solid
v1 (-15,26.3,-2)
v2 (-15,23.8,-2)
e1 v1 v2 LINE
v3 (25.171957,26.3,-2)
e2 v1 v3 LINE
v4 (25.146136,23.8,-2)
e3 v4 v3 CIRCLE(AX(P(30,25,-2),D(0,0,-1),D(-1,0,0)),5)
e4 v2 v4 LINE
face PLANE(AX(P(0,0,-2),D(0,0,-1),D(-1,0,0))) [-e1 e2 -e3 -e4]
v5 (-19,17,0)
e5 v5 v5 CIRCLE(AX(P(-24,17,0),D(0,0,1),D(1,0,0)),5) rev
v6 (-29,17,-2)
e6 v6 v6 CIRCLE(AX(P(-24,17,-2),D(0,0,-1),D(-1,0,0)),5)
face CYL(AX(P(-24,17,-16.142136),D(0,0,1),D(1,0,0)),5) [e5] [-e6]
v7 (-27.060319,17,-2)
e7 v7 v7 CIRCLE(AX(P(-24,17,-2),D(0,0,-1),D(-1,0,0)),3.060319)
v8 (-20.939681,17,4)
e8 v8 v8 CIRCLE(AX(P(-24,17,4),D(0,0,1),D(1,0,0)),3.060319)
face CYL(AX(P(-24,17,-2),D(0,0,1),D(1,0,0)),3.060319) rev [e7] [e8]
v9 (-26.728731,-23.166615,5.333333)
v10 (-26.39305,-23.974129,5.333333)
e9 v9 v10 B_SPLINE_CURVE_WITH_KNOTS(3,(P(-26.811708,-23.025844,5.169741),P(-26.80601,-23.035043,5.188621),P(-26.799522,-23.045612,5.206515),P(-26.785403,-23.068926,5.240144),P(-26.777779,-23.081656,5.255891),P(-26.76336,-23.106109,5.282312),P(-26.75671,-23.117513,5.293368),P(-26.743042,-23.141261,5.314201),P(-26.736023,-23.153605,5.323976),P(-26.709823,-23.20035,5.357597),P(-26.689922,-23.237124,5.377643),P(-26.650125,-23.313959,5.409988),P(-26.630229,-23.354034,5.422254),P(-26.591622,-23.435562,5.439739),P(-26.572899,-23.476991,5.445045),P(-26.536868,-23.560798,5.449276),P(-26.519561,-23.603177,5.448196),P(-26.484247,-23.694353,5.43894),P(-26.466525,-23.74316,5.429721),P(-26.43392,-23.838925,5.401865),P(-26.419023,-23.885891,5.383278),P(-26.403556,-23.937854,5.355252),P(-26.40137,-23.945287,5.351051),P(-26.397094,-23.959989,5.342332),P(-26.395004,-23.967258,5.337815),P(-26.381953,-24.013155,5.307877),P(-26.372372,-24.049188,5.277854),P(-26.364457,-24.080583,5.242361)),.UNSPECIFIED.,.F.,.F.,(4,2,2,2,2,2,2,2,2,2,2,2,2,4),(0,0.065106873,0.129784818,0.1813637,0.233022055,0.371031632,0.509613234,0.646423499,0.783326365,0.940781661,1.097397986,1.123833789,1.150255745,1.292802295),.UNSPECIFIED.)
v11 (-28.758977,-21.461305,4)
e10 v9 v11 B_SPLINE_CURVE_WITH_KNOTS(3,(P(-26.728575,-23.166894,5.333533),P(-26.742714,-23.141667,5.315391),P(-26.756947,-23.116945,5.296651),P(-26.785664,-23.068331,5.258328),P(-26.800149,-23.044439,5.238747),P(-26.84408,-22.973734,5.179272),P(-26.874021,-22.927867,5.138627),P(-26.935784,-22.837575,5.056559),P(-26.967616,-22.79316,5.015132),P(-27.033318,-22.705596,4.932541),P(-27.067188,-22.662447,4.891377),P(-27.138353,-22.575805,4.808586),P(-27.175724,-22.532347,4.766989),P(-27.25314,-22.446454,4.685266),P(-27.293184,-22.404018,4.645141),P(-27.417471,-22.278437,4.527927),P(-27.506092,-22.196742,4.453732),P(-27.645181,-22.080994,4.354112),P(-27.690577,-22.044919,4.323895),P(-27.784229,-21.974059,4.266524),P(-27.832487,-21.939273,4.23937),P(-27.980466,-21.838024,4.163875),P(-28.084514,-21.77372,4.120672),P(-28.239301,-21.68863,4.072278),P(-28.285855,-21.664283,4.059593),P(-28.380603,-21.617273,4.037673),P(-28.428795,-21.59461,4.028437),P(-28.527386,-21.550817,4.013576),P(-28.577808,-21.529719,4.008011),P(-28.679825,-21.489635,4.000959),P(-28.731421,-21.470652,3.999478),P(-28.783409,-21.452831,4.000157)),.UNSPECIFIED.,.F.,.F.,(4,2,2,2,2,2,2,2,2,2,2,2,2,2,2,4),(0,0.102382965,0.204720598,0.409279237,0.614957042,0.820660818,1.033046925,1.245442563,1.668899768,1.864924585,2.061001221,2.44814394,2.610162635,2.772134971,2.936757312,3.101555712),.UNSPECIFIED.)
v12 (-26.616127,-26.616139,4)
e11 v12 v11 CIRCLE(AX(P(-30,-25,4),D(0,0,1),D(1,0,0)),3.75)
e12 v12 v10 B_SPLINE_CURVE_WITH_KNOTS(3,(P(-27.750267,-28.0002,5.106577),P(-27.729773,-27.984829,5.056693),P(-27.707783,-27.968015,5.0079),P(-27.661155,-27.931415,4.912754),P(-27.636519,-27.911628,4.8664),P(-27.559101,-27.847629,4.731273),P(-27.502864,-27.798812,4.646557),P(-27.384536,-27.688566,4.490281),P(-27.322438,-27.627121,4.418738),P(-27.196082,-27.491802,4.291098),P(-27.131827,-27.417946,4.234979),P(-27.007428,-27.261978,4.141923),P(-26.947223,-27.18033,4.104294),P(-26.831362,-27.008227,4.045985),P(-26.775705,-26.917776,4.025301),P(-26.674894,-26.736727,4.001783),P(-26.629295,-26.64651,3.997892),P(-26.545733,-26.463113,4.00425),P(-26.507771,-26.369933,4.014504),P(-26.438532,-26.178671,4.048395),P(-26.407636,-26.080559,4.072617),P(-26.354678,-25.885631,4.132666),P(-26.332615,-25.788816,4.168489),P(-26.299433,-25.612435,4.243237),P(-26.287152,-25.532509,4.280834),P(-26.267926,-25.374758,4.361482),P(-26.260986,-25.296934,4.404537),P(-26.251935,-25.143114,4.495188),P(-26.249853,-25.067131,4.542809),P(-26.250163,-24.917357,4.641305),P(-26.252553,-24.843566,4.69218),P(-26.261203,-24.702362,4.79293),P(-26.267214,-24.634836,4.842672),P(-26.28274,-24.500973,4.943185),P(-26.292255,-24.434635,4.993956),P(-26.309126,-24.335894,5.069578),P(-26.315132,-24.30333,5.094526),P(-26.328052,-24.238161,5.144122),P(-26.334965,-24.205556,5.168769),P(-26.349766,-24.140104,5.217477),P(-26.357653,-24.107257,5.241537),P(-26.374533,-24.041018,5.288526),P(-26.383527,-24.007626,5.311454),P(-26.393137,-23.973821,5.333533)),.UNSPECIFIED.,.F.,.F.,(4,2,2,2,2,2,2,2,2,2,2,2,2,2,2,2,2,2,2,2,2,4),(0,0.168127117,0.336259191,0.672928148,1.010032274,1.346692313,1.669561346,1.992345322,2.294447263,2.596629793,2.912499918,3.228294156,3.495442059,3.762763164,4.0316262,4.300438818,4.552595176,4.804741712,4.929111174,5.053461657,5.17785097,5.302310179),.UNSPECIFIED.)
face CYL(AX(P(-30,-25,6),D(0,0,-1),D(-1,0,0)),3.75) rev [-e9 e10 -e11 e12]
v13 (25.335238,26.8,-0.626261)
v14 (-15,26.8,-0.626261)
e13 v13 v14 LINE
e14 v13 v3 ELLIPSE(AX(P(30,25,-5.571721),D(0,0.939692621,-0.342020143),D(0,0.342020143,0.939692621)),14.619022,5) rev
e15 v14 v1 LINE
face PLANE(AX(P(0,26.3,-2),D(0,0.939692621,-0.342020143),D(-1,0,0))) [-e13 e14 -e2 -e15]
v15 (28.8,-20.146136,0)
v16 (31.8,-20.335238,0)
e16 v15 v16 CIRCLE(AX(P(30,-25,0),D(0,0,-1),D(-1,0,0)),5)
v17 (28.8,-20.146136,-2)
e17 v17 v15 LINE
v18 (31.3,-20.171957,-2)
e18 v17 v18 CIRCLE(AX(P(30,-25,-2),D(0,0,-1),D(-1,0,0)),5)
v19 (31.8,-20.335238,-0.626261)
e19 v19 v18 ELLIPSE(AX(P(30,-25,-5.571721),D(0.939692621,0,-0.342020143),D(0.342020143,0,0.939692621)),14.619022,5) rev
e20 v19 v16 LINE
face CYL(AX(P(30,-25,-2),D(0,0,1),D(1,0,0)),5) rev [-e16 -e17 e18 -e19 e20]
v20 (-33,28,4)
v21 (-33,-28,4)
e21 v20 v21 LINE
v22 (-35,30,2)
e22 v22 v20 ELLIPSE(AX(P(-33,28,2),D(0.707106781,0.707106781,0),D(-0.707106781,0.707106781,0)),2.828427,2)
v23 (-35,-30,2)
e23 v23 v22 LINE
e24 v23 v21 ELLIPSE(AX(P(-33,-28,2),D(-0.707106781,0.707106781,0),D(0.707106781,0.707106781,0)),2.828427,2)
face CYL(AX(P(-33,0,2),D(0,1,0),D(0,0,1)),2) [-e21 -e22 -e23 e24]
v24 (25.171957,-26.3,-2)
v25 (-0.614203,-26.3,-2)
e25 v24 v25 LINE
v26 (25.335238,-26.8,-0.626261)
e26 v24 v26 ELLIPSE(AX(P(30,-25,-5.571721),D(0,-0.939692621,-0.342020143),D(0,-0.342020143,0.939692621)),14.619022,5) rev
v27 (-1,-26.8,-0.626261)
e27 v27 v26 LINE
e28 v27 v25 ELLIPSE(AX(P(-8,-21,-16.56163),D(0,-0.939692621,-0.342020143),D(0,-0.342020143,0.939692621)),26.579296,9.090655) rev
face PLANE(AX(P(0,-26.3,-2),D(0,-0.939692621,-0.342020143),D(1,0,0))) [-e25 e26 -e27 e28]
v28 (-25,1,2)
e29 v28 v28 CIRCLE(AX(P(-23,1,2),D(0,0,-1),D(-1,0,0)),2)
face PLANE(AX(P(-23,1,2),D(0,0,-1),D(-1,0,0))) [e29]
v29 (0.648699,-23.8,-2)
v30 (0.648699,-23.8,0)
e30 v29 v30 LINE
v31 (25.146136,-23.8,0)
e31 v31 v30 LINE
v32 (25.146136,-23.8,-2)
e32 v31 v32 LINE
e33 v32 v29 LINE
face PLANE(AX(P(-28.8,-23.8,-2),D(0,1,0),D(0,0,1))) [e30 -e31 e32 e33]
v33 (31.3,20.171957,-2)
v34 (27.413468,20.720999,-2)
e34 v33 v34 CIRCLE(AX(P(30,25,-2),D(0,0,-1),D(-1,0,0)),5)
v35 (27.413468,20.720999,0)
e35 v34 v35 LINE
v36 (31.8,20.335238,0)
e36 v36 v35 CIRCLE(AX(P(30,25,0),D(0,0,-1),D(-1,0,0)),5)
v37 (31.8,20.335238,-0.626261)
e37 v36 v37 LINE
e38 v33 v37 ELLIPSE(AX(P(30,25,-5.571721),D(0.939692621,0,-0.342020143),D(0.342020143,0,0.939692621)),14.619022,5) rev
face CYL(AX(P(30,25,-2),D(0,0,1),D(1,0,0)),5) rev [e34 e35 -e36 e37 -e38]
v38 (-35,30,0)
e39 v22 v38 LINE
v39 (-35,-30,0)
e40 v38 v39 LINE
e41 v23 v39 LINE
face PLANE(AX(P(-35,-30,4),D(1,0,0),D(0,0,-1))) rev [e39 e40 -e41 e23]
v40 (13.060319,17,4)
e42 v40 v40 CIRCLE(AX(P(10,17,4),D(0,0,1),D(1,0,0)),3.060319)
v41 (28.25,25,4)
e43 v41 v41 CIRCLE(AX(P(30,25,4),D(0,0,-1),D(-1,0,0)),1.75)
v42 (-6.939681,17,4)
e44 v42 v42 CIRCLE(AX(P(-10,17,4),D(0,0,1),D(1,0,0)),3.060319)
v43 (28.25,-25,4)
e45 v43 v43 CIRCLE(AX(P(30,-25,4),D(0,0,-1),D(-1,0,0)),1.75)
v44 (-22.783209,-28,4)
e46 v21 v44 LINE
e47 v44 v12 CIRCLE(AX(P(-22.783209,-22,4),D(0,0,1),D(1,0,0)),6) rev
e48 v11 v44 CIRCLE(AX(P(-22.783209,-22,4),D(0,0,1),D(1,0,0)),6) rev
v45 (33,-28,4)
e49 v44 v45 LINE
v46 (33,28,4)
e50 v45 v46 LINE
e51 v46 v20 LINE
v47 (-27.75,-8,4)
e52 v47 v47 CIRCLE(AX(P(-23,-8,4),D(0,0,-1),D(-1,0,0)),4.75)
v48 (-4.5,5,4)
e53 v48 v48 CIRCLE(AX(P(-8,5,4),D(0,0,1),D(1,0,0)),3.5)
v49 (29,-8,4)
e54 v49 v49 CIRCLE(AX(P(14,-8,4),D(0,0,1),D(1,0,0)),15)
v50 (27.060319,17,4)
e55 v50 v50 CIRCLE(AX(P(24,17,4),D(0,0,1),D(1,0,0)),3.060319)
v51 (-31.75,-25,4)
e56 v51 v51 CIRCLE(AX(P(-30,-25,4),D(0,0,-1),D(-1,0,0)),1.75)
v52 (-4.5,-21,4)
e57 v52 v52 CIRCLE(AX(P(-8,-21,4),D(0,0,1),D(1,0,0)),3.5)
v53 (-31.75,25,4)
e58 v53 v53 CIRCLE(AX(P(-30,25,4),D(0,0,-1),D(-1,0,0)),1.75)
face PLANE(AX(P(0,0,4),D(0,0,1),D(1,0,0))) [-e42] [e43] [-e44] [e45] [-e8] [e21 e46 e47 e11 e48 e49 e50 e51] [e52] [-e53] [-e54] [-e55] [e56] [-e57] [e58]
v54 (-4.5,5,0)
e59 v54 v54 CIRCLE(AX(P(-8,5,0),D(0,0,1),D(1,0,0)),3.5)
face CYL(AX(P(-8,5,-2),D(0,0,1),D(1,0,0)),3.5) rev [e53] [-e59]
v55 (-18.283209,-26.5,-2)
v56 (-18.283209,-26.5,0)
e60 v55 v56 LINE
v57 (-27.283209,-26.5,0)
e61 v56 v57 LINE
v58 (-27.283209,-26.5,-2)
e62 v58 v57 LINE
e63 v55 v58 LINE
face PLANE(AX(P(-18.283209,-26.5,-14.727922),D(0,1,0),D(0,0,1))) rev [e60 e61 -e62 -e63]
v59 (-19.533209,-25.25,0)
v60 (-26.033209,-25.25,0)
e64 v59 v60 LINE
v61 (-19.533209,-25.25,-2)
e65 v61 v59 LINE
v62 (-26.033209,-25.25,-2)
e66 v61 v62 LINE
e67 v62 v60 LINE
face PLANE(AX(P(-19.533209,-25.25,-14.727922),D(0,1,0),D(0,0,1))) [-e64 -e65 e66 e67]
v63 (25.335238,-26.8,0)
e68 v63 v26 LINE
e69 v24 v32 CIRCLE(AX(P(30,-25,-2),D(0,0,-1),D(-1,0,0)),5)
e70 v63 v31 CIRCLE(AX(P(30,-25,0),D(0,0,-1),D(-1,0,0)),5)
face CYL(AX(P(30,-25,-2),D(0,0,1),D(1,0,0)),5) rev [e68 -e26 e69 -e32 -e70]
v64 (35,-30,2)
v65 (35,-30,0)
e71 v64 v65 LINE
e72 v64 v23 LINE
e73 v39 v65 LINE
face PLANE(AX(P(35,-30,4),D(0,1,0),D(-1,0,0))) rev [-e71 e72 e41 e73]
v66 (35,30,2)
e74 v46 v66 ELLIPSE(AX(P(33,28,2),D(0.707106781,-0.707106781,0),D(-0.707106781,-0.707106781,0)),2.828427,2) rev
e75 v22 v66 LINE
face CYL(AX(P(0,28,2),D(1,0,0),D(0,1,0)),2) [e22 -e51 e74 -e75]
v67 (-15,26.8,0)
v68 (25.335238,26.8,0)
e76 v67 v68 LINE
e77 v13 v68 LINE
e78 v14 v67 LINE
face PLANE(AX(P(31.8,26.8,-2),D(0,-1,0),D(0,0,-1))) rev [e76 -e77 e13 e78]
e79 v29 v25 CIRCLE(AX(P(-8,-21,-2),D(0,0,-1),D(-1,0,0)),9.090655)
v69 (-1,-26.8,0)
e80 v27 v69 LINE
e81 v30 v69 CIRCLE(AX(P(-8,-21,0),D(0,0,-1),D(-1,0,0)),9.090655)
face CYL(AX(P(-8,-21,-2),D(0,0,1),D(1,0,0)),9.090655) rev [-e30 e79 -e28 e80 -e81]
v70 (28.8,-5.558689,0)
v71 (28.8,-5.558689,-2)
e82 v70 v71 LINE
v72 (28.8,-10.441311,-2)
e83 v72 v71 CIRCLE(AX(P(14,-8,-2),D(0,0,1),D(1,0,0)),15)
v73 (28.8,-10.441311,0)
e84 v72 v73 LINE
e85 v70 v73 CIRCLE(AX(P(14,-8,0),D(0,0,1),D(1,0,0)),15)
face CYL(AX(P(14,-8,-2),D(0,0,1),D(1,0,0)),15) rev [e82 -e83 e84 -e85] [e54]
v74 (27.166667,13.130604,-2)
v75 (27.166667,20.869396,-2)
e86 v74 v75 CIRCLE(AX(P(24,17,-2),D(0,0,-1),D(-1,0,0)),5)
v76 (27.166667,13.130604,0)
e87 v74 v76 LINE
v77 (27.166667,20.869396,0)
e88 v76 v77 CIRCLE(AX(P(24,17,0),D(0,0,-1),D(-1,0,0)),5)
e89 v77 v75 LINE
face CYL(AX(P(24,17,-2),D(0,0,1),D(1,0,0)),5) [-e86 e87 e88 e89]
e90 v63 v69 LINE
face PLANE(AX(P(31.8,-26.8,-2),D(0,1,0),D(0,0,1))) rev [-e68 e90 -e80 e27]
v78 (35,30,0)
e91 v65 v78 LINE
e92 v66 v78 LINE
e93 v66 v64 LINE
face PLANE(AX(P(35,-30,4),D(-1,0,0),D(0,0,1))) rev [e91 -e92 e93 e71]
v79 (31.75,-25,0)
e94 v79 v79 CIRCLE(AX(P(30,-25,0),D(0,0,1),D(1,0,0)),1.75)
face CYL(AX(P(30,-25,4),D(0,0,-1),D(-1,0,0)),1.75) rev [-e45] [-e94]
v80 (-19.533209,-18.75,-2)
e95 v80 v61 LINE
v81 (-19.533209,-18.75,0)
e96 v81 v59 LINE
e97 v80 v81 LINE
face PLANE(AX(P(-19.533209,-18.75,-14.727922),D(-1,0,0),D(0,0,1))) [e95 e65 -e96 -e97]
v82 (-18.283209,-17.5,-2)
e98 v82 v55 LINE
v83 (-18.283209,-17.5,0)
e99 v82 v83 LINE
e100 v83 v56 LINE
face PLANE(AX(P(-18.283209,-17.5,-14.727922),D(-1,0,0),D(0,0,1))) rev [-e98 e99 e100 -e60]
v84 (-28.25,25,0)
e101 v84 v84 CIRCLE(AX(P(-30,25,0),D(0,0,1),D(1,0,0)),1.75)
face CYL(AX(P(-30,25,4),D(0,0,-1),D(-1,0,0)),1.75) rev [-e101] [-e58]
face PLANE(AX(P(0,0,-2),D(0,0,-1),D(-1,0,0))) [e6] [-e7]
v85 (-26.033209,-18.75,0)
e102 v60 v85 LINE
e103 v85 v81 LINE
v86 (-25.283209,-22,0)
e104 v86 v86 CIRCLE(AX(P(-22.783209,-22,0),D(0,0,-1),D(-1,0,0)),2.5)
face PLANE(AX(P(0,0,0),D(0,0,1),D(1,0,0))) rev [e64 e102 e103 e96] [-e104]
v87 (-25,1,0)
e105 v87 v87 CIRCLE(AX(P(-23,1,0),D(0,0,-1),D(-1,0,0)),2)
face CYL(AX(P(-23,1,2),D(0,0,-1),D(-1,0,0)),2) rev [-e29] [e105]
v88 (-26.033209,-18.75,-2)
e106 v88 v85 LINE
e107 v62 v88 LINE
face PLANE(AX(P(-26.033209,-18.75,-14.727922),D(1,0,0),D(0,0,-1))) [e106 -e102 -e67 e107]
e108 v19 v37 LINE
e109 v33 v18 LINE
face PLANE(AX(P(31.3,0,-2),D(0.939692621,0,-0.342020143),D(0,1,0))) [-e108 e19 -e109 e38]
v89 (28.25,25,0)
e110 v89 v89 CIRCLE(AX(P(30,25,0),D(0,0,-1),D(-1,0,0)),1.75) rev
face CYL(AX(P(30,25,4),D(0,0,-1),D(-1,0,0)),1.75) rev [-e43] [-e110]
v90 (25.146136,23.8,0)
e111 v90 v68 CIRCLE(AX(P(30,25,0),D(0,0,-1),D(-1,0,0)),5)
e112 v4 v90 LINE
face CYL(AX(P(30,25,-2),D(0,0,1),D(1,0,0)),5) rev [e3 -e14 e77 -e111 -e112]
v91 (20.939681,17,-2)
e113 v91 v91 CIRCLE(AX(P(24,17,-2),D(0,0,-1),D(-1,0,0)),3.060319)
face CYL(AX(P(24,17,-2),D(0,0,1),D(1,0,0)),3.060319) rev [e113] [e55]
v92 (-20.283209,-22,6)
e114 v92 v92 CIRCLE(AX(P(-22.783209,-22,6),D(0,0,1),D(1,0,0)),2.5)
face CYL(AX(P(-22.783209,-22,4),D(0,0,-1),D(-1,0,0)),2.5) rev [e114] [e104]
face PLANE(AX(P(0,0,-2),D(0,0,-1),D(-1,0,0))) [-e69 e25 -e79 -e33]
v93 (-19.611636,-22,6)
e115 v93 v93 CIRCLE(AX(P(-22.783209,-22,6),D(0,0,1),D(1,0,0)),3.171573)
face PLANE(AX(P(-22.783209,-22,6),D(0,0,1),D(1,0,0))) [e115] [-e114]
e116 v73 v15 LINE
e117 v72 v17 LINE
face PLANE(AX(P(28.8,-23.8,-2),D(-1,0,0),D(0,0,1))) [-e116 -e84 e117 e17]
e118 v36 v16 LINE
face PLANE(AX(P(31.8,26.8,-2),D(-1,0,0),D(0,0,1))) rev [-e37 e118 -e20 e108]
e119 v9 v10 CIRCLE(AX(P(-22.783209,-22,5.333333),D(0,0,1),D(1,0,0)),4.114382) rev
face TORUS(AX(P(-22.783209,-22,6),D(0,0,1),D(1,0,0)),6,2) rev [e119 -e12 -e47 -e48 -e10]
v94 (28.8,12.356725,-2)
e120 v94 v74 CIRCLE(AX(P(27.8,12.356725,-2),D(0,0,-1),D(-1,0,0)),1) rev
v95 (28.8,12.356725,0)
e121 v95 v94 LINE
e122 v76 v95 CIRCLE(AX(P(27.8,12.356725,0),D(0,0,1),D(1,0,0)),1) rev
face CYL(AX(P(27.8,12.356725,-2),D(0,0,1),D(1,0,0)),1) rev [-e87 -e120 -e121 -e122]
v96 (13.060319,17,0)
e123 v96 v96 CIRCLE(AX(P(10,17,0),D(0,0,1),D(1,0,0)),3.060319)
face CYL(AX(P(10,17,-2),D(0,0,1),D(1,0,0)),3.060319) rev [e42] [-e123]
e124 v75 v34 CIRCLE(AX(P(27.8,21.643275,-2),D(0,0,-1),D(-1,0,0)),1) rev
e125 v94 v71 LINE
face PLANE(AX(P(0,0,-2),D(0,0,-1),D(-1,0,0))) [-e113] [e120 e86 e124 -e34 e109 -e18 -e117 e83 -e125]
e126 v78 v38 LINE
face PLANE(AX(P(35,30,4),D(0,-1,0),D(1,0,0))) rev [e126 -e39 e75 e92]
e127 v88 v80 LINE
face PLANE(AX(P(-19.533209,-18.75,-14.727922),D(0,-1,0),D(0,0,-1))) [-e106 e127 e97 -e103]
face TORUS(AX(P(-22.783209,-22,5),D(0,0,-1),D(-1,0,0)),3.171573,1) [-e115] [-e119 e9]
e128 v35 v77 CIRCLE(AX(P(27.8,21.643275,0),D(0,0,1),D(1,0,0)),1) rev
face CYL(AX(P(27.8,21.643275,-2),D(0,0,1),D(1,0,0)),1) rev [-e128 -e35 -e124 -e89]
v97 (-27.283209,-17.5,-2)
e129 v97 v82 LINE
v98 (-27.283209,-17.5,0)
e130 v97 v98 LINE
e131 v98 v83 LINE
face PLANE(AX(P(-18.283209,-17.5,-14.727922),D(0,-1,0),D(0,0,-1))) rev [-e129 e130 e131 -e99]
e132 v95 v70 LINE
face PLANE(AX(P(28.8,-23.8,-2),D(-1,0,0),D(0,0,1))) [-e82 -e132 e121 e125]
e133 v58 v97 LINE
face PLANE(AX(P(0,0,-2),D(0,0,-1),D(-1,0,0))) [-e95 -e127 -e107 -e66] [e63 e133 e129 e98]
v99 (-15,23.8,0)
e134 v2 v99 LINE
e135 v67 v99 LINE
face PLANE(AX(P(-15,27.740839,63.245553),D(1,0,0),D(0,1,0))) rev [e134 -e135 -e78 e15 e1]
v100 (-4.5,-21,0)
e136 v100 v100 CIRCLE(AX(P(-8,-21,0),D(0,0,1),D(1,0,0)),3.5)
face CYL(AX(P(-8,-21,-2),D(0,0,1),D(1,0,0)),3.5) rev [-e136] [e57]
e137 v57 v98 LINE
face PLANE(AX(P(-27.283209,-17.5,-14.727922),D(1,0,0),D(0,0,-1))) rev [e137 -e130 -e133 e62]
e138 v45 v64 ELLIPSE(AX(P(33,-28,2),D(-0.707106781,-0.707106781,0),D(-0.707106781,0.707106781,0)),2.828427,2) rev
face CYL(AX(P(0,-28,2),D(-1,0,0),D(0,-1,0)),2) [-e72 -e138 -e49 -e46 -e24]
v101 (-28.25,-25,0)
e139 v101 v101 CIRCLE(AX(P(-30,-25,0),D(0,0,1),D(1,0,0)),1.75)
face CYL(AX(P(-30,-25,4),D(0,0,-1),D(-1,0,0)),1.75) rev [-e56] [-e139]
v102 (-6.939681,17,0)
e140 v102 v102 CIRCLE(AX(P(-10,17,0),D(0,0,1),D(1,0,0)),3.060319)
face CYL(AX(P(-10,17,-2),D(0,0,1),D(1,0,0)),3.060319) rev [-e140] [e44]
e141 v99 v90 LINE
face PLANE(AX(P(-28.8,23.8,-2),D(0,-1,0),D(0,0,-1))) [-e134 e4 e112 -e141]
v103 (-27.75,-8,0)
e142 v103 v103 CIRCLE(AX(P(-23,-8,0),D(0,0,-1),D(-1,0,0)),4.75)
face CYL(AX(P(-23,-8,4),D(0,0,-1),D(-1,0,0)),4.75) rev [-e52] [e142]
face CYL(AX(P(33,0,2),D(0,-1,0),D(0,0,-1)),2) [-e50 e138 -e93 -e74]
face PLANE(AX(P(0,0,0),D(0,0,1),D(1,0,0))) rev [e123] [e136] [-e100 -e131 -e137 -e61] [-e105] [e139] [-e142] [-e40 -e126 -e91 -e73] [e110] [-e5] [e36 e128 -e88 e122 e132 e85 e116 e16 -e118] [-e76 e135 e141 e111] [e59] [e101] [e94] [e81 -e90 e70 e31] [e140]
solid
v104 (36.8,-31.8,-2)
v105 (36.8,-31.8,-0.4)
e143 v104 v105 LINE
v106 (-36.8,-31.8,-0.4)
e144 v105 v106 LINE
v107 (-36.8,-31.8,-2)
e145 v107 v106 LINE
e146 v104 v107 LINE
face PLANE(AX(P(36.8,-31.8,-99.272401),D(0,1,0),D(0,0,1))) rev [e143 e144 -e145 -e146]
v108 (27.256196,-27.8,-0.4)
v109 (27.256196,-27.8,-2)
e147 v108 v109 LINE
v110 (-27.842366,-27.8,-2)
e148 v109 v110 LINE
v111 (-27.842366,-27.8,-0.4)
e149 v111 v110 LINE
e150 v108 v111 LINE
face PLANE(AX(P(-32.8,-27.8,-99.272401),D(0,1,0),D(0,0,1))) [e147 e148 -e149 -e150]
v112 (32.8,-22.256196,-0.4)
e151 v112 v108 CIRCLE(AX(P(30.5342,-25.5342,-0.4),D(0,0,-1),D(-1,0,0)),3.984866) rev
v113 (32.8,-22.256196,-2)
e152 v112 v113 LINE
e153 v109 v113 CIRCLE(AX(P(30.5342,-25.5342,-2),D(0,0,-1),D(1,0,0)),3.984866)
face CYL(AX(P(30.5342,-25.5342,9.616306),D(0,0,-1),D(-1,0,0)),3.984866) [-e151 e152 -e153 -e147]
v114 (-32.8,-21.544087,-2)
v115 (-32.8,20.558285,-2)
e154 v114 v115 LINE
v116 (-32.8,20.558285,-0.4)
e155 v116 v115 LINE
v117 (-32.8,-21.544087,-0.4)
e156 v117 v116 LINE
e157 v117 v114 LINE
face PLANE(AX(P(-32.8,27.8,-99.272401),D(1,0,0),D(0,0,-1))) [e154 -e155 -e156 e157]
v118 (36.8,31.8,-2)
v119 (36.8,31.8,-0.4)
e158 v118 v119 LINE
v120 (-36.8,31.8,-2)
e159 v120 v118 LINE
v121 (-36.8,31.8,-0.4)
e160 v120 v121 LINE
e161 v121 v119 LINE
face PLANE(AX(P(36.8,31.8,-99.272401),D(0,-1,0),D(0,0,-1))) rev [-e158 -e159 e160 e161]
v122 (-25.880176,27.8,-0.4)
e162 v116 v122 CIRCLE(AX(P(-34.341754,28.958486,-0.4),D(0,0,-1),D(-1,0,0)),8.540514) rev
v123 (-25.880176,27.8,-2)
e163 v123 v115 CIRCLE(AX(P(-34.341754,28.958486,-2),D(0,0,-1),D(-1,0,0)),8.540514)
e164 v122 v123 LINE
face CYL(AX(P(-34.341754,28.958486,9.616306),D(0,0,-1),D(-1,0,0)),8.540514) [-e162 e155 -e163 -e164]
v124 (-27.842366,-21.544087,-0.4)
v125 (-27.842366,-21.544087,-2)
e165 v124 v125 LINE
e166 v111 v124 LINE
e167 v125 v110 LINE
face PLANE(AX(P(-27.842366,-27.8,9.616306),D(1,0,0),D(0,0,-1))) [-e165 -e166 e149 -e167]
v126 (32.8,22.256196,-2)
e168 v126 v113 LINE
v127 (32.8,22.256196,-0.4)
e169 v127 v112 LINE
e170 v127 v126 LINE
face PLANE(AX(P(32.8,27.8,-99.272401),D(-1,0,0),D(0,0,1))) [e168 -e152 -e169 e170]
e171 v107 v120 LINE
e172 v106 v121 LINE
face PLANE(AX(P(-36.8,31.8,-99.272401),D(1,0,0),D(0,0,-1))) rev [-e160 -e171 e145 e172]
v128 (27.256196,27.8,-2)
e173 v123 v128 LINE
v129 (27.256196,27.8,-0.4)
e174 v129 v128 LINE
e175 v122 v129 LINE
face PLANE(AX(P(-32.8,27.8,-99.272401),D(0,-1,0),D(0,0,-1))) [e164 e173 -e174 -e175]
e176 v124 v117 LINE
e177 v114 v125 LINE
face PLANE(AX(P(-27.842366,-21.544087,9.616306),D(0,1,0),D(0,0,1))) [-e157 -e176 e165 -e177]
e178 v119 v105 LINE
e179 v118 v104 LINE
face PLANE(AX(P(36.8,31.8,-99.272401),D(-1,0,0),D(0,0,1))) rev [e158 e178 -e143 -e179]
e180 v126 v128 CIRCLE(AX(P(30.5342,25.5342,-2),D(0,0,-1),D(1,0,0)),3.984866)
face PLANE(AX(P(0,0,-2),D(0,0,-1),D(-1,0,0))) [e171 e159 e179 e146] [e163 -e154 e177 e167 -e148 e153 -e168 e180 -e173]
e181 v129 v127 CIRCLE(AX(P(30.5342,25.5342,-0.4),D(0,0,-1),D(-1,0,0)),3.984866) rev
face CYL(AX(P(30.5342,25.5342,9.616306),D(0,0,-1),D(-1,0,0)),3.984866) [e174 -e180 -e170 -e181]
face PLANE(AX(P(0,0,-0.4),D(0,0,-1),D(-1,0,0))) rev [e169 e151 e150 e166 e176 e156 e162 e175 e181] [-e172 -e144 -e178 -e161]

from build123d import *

# Parameters (mm, degrees)
SKETCH1_W               = 70
SKETCH1_H               = 60
BOSS_EXTRUDE1_DEPTH     = 4
SKETCH2_W               = 63.6
SKETCH2_H               = 53.6
SKETCH2_W_2             = 57.6
SKETCH2_H_2             = 47.6
BOSS_EXTRUDE2_DEPTH     = 2
CHAMFER1_SIZE           = 0.5
CHAMFER1_SIZE2          = 1.37373871
FILLET1_R               = 2
SKETCH3_R               = 3.060318858
CUT_EXTRUDE1_DEPTH      = 47.486557197
SKETCH4_R               = 15
CUT_EXTRUDE2_DEPTH      = 47.486557197
SKETCH5_R               = 3.5
CUT_EXTRUDE3_DEPTH      = 47.486557197
SKETCH6_R               = 5
SKETCH6_R_2             = 3.060318858
BOSS_EXTRUDE3_DEPTH     = 2
FILLET2_R               = 1
CUT_EXTRUDE4_REACH      = 48.487
SKETCH7_W               = 20
SKETCH7_H               = 60
SKETCH8_R               = 4.75
CUT_EXTRUDE5_DEPTH      = 47.270941205
CUT_EXTRUDE6_DEPTH      = 47.270941205
CUT_EXTRUDE6_DEPTH_BACK = 47.270941205
SKETCH9_R               = 1.75
SKETCH10_R              = 2
CUT_EXTRUDE7_DEPTH      = 2
SKETCH11_R              = 5
SKETCH11_R_2            = 3.060318858
BOSS_EXTRUDE4_DEPTH     = 2
SKETCH12_R              = 5
CUT_EXTRUDE9_DEPTH      = 47.270941205
SKETCH13_R              = 2.5
CUT_EXTRUDE10_DEPTH     = 47.270941205
SKETCH14_W              = 9
SKETCH14_H              = 9
SKETCH14_W_2            = 6.5
SKETCH14_H_2            = 6.5
BOSS_EXTRUDE5_DEPTH     = 2
SKETCH17_R              = 4
SKETCH17_R_2            = 2.5
BOSS_EXTRUDE7_DEPTH     = 2
FILLET5_R               = 2
FILLET6_R               = 1
SKETCH18_R              = 3.75
CUT_EXTRUDE13_DEPTH     = 47.486557197
BOSS_EXTRUDE8_START     = 0.4
SKETCH19_W              = 73.6
SKETCH19_H              = 63.6
SKETCH19_W_2            = 65.6
SKETCH19_H_2            = 55.6
BOSS_EXTRUDE8_DEPTH     = 1.6
SKETCH21_R              = 9.090654542
CUT_EXTRUDE15_DEPTH     = 50.004897727
SKETCH20_W              = 4.957633968
SKETCH20_H              = 6.255912851
SUPPORT_DEPTH           = 1.6


with BuildPart() as part:
    # Sketch1 → Boss-Extrude1 (new body)
    with BuildSketch(Plane.XY):
        Rectangle(SKETCH1_W, SKETCH1_H)
    extrude(amount=BOSS_EXTRUDE1_DEPTH)

    # Sketch2 → Boss-Extrude2 (add)
    with BuildSketch(Plane(origin=(0, 0, 0), x_dir=(-1, 0, 0), z_dir=(0, 0, -1))):
        Rectangle(SKETCH2_W, SKETCH2_H)
        Rectangle(SKETCH2_W_2, SKETCH2_H_2, mode=Mode.SUBTRACT)
    extrude(amount=BOSS_EXTRUDE2_DEPTH)

    # Chamfer1
    chamfer1_edges = [part.edges().sort_by_distance(p)[0] for p in [
        (-31.8, 0, -2),
        (0, 26.8, -2),
        (31.8, 0, -2),
        (0, -26.8, -2),
    ]]
    chamfer1_side = [part.faces().sort_by_distance(p)[0] for p in [
        (0, 25.968259656, -2),
    ]]
    chamfer(chamfer1_edges, length=CHAMFER1_SIZE, length2=CHAMFER1_SIZE2, reference=chamfer1_side[0])

    # Fillet1
    fillet1_edges = [part.edges().sort_by_distance(p)[0] for p in [
        (35, 0, 4),
        (0, 30, 4),
        (-35, 0, 4),
        (0, -30, 4),
    ]]
    fillet(fillet1_edges, radius=FILLET1_R)

    # Sketch3 → Cut-Extrude1 (cut, through all)
    with BuildSketch(Plane.XY.offset(4)):
        with Locations((-24, 17)):
            Circle(SKETCH3_R)
        with Locations((10, 17)):
            Circle(SKETCH3_R)
        with Locations((-10, 17)):
            Circle(SKETCH3_R)
        with Locations((24, 17)):
            Circle(SKETCH3_R)
    extrude(amount=-CUT_EXTRUDE1_DEPTH, mode=Mode.SUBTRACT)

    # Sketch4 → Cut-Extrude2 (cut, through all)
    with BuildSketch(Plane.XY.offset(4)):
        with Locations((14, -8)):
            Circle(SKETCH4_R)
    extrude(amount=-CUT_EXTRUDE2_DEPTH, mode=Mode.SUBTRACT)

    # Sketch5 → Cut-Extrude3 (cut, through all)
    with BuildSketch(Plane.XY.offset(4)):
        with Locations((-8, 5)):
            Circle(SKETCH5_R)
        with Locations((-8, -21)):
            Circle(SKETCH5_R)
    extrude(amount=-CUT_EXTRUDE3_DEPTH, mode=Mode.SUBTRACT)

    # Sketch6 → Boss-Extrude3 (add)
    # profile 1 of 2: a face of its own
    with BuildSketch(Plane(origin=(0, 0, 0), x_dir=(-1, 0, 0), z_dir=(0, 0, -1))):
        with Locations((24, 17)):
            Circle(SKETCH6_R)
        with Locations(Location((24, 17, 0), (0, 0, 180))):
            Circle(SKETCH6_R_2, mode=Mode.SUBTRACT)
    # profile 2 of 2: a face of its own
    with BuildSketch(Plane(origin=(0, 0, 0), x_dir=(-1, 0, 0), z_dir=(0, 0, -1))):
        with Locations((-24, 17)):
            Circle(SKETCH6_R)
        with Locations(Location((-24, 17, 0), (0, 0, 180))):
            Circle(SKETCH6_R_2, mode=Mode.SUBTRACT)
    extrude(amount=BOSS_EXTRUDE3_DEPTH)

    # Fillet2
    fillet2_edges = [part.edges().sort_by_distance(p)[0] for p in [
        (28.8, 18.4, -1),
        (28.8, 15.6, -1),
        (28.8, 23.8, -1),
    ]]
    fillet(fillet2_edges, radius=FILLET2_R)

    # Cut-Extrude4: up to this face of the body (flat: up to its plane)
    cut_extrude4_end = Plane(part.part.faces().sort_by_distance((-5.37613494, 1.437428998, 0))[0])
    # Sketch7 → Cut-Extrude4 (cut, up to the picked face)
    with BuildSketch(Plane(origin=(0, 0, -2), x_dir=(-1, 0, 0), z_dir=(0, 0, -1)), mode=Mode.PRIVATE) as cut_extrude4_sk1:
        with Locations((25, -2.259161332)):
            Rectangle(SKETCH7_W, SKETCH7_H)
    cut_extrude4_tool1 = split(extrude(cut_extrude4_sk1.sketch, amount=-CUT_EXTRUDE4_REACH, mode=Mode.PRIVATE), bisect_by=cut_extrude4_end, keep=Keep.BOTH, mode=Mode.PRIVATE)
    add(cut_extrude4_tool1.solids().sort_by(Axis((-25, -2.259161, -2), (0, 0, 1)))[0], mode=Mode.SUBTRACT)

    # Sketch8 → Cut-Extrude5 (cut, through all)
    with BuildSketch(Plane(origin=(0, 0, 0), x_dir=(-1, 0, 0), z_dir=(0, 0, -1))):
        with Locations((23, -8)):
            Circle(SKETCH8_R)
    extrude(amount=-CUT_EXTRUDE5_DEPTH, mode=Mode.SUBTRACT)

    # Sketch9 → Cut-Extrude6 (cut, two sides: drawn at the far end of the back side and taken through both)
    with BuildSketch(Plane(origin=(0, 0, 0), x_dir=(-1, 0, 0), z_dir=(0, 0, -1)).offset(-CUT_EXTRUDE6_DEPTH_BACK)):
        with Locations((30, 25)):
            Circle(SKETCH9_R)
        with Locations((30, -25)):
            Circle(SKETCH9_R)
        with Locations((-30, -25)):
            Circle(SKETCH9_R)
        with Locations((-30, 25)):
            Circle(SKETCH9_R)
    extrude(amount=CUT_EXTRUDE6_DEPTH + CUT_EXTRUDE6_DEPTH_BACK, mode=Mode.SUBTRACT)

    # Sketch10 → Cut-Extrude7 (cut)
    with BuildSketch(Plane(origin=(0, 0, 0), x_dir=(-1, 0, 0), z_dir=(0, 0, -1))):
        with Locations((23, 1)):
            Circle(SKETCH10_R)
    extrude(amount=-CUT_EXTRUDE7_DEPTH, mode=Mode.SUBTRACT)

    # Sketch11 → Boss-Extrude4 (add)
    with BuildSketch(Plane(origin=(0, 0, 0), x_dir=(-1, 0, 0), z_dir=(0, 0, -1))):
        with Locations(Location((24, 17, 0), (0, 0, 180))):
            Circle(SKETCH11_R)
        with Locations(Location((24, 17, 0), (0, 0, 180))):
            Circle(SKETCH11_R_2, mode=Mode.SUBTRACT)
    extrude(amount=BOSS_EXTRUDE4_DEPTH)

    # Sketch12 → Cut-Extrude9 (cut, through all)
    with BuildSketch(Plane(origin=(0, 0, 0), x_dir=(-1, 0, 0), z_dir=(0, 0, -1))):
        with Locations((-30, 25)):
            Circle(SKETCH12_R)
        with Locations((-30, -25)):
            Circle(SKETCH12_R)
    extrude(amount=CUT_EXTRUDE9_DEPTH, mode=Mode.SUBTRACT)

    # Sketch13 → Cut-Extrude10 (cut, through all)
    with BuildSketch(Plane(origin=(0, 0, 0), x_dir=(-1, 0, 0), z_dir=(0, 0, -1))):
        with Locations((22.783208656, -22)):
            Circle(SKETCH13_R)
    extrude(amount=-CUT_EXTRUDE10_DEPTH, mode=Mode.SUBTRACT)

    # Sketch14 → Boss-Extrude5 (add)
    with BuildSketch(Plane(origin=(0, 0, 0), x_dir=(-1, 0, 0), z_dir=(0, 0, -1))):
        with Locations((22.783208656, -22)):
            Rectangle(SKETCH14_W, SKETCH14_H)
        with Locations((22.783208656, -22)):
            Rectangle(SKETCH14_W_2, SKETCH14_H_2, mode=Mode.SUBTRACT)
    extrude(amount=BOSS_EXTRUDE5_DEPTH)

    # Sketch17 → Boss-Extrude7 (add)
    with BuildSketch(Plane.XY.offset(4)):
        with Locations((-22.783208656, -22)):
            Circle(SKETCH17_R)
        with Locations(Location((-22.783208656, -22, 0), (0, 0, 180))):
            Circle(SKETCH17_R_2, mode=Mode.SUBTRACT)
    extrude(amount=BOSS_EXTRUDE7_DEPTH)

    # Fillet5
    fillet5_edges = [part.edges().sort_by_distance(p)[0] for p in [
        (-26.783208656, -22, 4),
    ]]
    fillet(fillet5_edges, radius=FILLET5_R - 0.0001)  # a hair under: the kernel refuses the full size

    # Fillet6
    fillet6_edges = [part.edges().sort_by_distance(p)[0] for p in [
        (-26.783208656, -22, 6),
    ]]
    fillet(fillet6_edges, radius=FILLET6_R)

    # Sketch18 → Cut-Extrude13 (cut, through all)
    with BuildSketch(Plane.XY.offset(4)):
        with Locations((-30, -25)):
            Circle(SKETCH18_R)
    extrude(amount=CUT_EXTRUDE13_DEPTH, mode=Mode.SUBTRACT)

    # Sketch21 → Cut-Extrude15 (cut, through all)
    with BuildSketch(Plane(origin=(0, 0, 0), x_dir=(-1, 0, 0), z_dir=(0, 0, -1))):
        with Locations((8, -21)):
            Circle(SKETCH21_R)
    extrude(amount=CUT_EXTRUDE15_DEPTH, mode=Mode.SUBTRACT)


with BuildPart() as body_2:
    # Sketch19 → Boss-Extrude8 (new body)
    with BuildSketch(Plane(origin=(0, 0, 0), x_dir=(-1, 0, 0), z_dir=(0, 0, -1)).offset(BOSS_EXTRUDE8_START)):
        Rectangle(SKETCH19_W, SKETCH19_H)
        Rectangle(SKETCH19_W_2, SKETCH19_H_2, mode=Mode.SUBTRACT)
    extrude(amount=BOSS_EXTRUDE8_DEPTH)

    # Sketch20 → support (add)
    with BuildSketch(Plane(origin=(0, 0, -2), x_dir=(-1, 0, 0), z_dir=(0, 0, -1))):
        with BuildLine():
            Line((-27.256195726, 27.8), (-32.8, 27.8))
            Line((-32.8, 27.8), (-32.8, 22.256195726))
            ThreePointArc((-32.8, 22.256195726), (-27.716473501, 22.716473501), (-27.256195726, 27.8))
        make_face()
        with BuildLine():
            Line((-32.8, -22.256195726), (-32.8, -27.8))
            Line((-32.8, -27.8), (-27.256195726, -27.8))
            ThreePointArc((-27.256195726, -27.8), (-27.716473501, -22.716473501), (-32.8, -22.256195726))
        make_face()
        with BuildLine():
            Line((25.880176368, 27.8), (32.8, 27.8))
            Line((32.8, 27.8), (32.8, 20.558285253))
            ThreePointArc((32.8, 20.558285253), (28.167025653, 23.058222222), (25.880176368, 27.8))
        make_face()
        with Locations((30.321183016, -24.672043575)):
            Rectangle(SKETCH20_W, SKETCH20_H)
    extrude(amount=-SUPPORT_DEPTH)


solid = Compound([part.part, body_2.part])
